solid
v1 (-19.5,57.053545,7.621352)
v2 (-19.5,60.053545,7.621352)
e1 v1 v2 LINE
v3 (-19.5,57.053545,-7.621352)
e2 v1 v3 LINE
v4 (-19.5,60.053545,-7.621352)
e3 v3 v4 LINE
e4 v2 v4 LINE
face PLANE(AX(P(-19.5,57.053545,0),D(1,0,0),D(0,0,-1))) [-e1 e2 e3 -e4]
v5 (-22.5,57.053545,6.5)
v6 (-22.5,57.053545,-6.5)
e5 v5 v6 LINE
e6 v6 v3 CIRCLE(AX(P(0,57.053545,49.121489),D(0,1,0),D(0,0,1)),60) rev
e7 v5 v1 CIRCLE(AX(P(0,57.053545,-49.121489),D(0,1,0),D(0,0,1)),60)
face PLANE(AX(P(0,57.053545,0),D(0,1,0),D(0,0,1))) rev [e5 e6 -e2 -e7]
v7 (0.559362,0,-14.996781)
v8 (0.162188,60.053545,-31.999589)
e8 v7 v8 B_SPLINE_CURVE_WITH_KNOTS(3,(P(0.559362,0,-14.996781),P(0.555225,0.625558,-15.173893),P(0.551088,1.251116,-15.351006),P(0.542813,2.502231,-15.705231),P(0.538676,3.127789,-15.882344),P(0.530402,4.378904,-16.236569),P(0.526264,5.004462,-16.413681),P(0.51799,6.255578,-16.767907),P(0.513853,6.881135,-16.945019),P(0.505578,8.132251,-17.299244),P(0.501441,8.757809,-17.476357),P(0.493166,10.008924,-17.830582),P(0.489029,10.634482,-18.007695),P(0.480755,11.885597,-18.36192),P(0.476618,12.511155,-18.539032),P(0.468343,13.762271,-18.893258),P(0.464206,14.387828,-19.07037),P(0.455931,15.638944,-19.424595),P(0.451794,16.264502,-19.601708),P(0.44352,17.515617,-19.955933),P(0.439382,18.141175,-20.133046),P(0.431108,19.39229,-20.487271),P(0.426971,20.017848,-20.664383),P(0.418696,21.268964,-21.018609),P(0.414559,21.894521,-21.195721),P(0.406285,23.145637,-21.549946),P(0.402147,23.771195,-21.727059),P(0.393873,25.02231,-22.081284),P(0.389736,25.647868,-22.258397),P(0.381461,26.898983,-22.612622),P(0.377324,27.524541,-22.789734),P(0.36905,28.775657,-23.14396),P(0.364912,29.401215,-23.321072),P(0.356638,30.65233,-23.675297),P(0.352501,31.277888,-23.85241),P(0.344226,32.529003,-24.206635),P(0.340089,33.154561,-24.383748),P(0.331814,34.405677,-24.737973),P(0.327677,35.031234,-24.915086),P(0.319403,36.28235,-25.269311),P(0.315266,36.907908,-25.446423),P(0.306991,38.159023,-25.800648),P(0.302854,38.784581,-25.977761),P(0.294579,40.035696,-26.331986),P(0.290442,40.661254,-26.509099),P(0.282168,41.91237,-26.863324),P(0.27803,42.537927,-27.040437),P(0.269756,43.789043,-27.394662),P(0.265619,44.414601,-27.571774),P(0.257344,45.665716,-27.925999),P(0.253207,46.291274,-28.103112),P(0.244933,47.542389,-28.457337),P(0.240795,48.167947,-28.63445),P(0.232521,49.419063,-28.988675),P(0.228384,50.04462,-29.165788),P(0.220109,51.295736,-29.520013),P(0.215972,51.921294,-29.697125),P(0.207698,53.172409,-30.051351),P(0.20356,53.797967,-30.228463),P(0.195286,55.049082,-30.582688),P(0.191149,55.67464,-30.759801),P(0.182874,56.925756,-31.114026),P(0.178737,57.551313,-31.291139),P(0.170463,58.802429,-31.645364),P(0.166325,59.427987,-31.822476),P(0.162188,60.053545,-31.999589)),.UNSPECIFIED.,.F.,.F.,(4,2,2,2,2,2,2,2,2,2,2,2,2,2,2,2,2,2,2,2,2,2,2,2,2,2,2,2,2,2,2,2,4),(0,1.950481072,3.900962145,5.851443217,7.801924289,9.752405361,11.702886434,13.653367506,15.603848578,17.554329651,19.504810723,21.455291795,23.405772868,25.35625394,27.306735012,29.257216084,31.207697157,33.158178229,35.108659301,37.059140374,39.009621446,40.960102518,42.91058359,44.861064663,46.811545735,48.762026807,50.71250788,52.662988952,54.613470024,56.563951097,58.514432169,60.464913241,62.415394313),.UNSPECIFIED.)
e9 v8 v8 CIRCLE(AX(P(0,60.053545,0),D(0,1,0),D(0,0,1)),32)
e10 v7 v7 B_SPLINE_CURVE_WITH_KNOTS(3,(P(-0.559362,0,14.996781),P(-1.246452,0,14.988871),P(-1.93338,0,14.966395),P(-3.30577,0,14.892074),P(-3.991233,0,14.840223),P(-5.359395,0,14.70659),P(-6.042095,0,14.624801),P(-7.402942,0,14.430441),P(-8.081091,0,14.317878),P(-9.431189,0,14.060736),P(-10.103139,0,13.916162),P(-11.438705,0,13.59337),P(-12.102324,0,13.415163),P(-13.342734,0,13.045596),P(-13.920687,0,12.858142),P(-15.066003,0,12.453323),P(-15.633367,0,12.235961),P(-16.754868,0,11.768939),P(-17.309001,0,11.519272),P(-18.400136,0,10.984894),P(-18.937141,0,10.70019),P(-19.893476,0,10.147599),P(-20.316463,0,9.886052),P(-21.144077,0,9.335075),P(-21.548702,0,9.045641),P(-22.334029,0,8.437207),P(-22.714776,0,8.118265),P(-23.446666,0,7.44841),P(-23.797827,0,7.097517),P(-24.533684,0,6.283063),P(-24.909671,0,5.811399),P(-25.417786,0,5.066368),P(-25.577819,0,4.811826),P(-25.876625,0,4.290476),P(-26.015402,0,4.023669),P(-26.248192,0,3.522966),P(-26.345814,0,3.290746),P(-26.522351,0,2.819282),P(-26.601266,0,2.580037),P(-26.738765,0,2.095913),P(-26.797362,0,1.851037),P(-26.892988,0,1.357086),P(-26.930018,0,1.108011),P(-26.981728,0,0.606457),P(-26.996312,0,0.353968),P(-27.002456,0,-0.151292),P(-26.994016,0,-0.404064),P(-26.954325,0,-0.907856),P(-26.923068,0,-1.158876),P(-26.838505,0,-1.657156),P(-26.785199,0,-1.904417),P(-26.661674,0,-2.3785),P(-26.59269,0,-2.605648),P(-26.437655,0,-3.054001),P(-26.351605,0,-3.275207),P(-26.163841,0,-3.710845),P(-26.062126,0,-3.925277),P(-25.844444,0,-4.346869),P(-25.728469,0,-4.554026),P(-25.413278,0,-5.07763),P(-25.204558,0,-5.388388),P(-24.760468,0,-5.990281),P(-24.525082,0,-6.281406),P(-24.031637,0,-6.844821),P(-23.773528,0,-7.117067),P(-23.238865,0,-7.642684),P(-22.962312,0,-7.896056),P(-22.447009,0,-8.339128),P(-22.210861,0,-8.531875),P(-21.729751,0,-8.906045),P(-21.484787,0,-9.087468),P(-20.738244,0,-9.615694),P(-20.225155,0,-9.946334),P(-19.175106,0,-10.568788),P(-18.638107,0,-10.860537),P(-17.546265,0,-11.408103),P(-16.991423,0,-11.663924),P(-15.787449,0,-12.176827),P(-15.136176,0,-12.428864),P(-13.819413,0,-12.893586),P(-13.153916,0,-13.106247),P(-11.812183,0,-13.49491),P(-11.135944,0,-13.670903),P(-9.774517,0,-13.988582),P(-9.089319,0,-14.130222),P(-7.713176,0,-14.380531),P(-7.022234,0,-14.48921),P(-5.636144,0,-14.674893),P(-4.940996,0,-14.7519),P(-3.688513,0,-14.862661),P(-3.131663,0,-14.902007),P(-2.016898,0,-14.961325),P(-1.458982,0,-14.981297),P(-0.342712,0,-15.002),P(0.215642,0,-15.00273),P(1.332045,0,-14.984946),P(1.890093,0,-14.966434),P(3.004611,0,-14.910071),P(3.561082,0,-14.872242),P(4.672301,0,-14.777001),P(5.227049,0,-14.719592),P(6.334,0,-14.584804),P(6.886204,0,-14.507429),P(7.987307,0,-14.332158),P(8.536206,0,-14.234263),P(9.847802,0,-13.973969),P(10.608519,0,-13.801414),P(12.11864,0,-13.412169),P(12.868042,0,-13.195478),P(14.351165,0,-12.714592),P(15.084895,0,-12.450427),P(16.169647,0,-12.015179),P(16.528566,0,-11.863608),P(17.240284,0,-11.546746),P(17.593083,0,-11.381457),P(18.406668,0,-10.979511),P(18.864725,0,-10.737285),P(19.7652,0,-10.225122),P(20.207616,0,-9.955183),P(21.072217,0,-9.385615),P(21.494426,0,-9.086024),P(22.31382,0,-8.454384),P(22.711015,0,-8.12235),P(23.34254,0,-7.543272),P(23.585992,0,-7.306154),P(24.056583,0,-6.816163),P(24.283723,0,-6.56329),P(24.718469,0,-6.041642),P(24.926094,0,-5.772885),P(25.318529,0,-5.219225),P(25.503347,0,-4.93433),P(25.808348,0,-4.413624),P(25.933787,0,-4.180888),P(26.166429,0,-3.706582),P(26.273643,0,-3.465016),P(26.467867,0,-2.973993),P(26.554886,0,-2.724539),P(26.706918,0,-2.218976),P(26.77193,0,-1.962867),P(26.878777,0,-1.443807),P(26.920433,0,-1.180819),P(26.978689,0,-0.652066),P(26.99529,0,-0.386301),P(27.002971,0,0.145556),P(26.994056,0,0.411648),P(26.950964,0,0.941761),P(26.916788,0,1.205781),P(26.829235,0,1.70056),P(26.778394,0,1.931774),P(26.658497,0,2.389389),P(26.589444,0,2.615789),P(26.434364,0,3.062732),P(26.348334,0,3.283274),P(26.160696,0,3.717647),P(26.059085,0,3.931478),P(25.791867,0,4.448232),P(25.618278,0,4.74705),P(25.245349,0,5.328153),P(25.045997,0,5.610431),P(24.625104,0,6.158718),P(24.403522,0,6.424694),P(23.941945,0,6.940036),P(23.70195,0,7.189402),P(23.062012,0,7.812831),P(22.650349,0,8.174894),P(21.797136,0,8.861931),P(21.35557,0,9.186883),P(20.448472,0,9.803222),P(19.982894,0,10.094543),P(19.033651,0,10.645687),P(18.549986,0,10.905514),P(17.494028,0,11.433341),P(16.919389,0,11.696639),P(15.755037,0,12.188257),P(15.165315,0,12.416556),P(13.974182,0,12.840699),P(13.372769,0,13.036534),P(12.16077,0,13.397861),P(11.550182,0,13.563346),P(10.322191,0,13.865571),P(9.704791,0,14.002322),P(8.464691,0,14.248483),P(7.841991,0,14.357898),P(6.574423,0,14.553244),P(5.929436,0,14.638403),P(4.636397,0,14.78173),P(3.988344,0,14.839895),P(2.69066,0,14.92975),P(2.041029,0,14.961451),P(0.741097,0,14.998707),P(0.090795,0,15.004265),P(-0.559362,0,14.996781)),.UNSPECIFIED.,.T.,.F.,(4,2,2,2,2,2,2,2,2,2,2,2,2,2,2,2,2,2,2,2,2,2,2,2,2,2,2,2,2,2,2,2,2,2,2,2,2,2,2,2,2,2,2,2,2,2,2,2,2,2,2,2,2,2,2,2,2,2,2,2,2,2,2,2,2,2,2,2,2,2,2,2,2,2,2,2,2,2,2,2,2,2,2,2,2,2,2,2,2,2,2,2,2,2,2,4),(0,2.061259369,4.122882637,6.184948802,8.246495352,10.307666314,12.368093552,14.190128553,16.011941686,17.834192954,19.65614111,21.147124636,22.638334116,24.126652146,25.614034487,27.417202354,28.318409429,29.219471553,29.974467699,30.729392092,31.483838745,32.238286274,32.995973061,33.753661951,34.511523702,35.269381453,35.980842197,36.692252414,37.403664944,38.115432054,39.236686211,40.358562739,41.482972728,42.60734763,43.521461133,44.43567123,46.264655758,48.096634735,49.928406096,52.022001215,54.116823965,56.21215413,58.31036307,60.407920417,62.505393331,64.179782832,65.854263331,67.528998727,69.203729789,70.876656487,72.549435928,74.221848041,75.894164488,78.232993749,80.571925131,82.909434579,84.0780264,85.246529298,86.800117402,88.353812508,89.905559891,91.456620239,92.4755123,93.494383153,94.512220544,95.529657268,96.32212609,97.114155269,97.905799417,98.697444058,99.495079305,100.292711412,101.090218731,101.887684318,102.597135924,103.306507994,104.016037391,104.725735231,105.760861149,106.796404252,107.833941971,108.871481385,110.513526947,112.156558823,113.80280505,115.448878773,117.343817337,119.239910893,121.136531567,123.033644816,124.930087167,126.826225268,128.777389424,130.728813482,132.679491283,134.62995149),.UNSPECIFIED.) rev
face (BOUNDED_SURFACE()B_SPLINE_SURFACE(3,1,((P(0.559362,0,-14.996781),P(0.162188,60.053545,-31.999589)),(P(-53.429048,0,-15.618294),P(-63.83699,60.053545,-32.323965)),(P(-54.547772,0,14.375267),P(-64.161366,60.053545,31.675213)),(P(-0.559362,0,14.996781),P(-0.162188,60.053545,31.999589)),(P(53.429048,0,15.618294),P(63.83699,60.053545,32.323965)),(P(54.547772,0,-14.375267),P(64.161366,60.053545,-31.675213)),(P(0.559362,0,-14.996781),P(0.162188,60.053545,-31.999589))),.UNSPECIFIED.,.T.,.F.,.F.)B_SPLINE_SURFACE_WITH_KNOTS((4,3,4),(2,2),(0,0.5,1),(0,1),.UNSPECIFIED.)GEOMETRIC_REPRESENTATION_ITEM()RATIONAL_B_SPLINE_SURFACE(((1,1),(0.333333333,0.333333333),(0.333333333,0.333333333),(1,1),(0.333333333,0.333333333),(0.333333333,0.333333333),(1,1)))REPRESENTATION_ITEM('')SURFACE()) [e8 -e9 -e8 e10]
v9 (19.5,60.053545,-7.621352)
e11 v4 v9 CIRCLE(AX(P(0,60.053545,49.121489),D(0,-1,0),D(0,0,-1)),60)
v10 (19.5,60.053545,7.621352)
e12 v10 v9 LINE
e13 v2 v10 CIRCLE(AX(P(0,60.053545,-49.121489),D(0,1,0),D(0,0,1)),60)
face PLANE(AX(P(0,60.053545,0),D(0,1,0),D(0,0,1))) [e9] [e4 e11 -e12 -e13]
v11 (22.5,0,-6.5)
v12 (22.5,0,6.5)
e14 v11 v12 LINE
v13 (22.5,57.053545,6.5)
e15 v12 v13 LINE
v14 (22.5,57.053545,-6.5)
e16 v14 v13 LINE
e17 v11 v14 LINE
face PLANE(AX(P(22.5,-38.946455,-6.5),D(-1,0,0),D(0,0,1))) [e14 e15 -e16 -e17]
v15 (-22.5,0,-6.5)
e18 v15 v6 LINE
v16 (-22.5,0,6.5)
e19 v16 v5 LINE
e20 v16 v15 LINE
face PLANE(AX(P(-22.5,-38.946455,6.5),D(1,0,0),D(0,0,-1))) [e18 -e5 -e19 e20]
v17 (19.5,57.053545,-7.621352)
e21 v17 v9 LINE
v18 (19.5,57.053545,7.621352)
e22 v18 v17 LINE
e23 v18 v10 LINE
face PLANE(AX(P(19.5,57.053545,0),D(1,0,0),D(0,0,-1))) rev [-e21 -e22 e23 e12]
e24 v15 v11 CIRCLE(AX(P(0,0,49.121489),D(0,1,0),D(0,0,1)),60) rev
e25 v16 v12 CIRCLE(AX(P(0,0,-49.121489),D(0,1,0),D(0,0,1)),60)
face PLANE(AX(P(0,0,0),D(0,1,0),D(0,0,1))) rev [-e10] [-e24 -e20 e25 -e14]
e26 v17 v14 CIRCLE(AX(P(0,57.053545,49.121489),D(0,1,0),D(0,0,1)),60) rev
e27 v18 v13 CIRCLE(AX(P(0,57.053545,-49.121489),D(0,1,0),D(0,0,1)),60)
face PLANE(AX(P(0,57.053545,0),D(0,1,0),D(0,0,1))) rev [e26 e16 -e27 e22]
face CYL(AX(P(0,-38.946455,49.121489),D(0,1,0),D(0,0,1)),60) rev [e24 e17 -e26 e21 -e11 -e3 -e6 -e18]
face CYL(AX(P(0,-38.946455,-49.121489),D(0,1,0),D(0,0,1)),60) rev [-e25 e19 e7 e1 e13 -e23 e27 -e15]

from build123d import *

# Parameters (mm, degrees)
SKETCH3_RX          = 27
SKETCH3_RY          = 15
BOSS_EXTRUDE1_DEPTH = 60.053544519
CUT_EXTRUDE1_DEPTH  = 99
BOSS_EXTRUDE2_DEPTH = 3


with BuildPart() as part:
    # Sketch3 → Boss-Extrude1 (new body)
    with BuildSketch(Plane(origin=(0, 0, 0), x_dir=(1, 0, 0), z_dir=(0, 1, 0))):
        with Locations((0, 0)):
            Ellipse(SKETCH3_RX, SKETCH3_RY)
        with BuildLine():
            Line((22.5, 6.5), (22.5, -6.5))
            ThreePointArc((22.5, -6.5), (0, -10.878511347), (-22.5, -6.5))
            Line((-22.5, -6.5), (-22.5, 6.5))
            ThreePointArc((-22.5, 6.5), (0, 10.878511347), (22.5, 6.5))
        make_face(mode=Mode.SUBTRACT)
    extrude(amount=BOSS_EXTRUDE1_DEPTH)

    # Loft9: read off the stored shape, not the designer's step
    # Loft9: loft between two sections, ruled curve by curve
    loft9_from = [
        Edge.make_bspline([(0.559362113, 0, -14.996780663), (-53.429048274, 0, -15.618294122), (-54.5477725, 0, 14.375267204), (-0.559362113, 0, 14.996780663), (53.429048274, 0, 15.618294122), (54.5477725, 0, -14.375267204), (0.559362113, 0, -14.996780663)], [0, 0, 0, 0, 0.5, 0.5, 0.5, 1, 1, 1, 1], 3, [1, 0.333333333, 0.333333333, 1, 0.333333333, 0.333333333, 1]),
    ]
    loft9_to = [
        Edge.make_bspline([(0.162188065, 60.053544519, -31.999588982), (-63.836989899, 60.053544519, -32.323965112), (-64.16136603, 60.053544519, 31.675212852), (-0.162188065, 60.053544519, 31.999588982), (63.836989899, 60.053544519, 32.323965112), (64.16136603, 60.053544519, -31.675212852), (0.162188065, 60.053544519, -31.999588982)], [0, 0, 0, 0, 0.5, 0.5, 0.5, 1, 1, 1, 1], 3, [1, 0.333333333, 0.333333333, 1, 0.333333333, 0.333333333, 1]),
    ]
    loft9 = Solid(Shell([*[Face.make_surface_from_curves(loft9_from[k], loft9_to[k]) for k in range(1)], Face(Wire(loft9_from)), Face(Wire(loft9_to))]))
    add(loft9)

    # Sketch5 → Cut-Extrude1 (cut)
    with BuildSketch(Plane(origin=(0, 60.053544519, 0), x_dir=(1, 0, 0), z_dir=(0, 1, 0))):
        with BuildLine():
            Line((22.5, 6.5), (22.5, -6.5))
            ThreePointArc((22.5, -6.5), (0, -10.878511347), (-22.5, -6.5))
            Line((-22.5, -6.5), (-22.5, 6.5))
            ThreePointArc((-22.5, 6.5), (0, 10.878511347), (22.5, 6.5))
        make_face()
    extrude(amount=-CUT_EXTRUDE1_DEPTH, mode=Mode.SUBTRACT)

    # Sketch5<4> → Boss-Extrude2 (add)
    with BuildSketch(Plane(origin=(0, 60.053544519, 0), x_dir=(1, 0, 0), z_dir=(0, 1, 0))):
        with BuildLine():
            Line((-19.5, -7.621352305), (-19.5, 7.621352305))
            ThreePointArc((-19.5, 7.621352305), (-21.007483375, 7.080696734), (-22.5, 6.5))
            Line((-22.5, 6.5), (-22.5, -6.5))
            ThreePointArc((-22.5, -6.5), (-21.007483375, -7.080696734), (-19.5, -7.621352305))
        make_face()
        with BuildLine():
            Line((22.5, -6.5), (22.5, 6.5))
            ThreePointArc((22.5, 6.5), (21.007483375, 7.080696734), (19.5, 7.621352305))
            Line((19.5, 7.621352305), (19.5, -7.621352305))
            ThreePointArc((19.5, -7.621352305), (21.007483375, -7.080696734), (22.5, -6.5))
        make_face()
    extrude(amount=-BOSS_EXTRUDE2_DEPTH)


solid = part.part
